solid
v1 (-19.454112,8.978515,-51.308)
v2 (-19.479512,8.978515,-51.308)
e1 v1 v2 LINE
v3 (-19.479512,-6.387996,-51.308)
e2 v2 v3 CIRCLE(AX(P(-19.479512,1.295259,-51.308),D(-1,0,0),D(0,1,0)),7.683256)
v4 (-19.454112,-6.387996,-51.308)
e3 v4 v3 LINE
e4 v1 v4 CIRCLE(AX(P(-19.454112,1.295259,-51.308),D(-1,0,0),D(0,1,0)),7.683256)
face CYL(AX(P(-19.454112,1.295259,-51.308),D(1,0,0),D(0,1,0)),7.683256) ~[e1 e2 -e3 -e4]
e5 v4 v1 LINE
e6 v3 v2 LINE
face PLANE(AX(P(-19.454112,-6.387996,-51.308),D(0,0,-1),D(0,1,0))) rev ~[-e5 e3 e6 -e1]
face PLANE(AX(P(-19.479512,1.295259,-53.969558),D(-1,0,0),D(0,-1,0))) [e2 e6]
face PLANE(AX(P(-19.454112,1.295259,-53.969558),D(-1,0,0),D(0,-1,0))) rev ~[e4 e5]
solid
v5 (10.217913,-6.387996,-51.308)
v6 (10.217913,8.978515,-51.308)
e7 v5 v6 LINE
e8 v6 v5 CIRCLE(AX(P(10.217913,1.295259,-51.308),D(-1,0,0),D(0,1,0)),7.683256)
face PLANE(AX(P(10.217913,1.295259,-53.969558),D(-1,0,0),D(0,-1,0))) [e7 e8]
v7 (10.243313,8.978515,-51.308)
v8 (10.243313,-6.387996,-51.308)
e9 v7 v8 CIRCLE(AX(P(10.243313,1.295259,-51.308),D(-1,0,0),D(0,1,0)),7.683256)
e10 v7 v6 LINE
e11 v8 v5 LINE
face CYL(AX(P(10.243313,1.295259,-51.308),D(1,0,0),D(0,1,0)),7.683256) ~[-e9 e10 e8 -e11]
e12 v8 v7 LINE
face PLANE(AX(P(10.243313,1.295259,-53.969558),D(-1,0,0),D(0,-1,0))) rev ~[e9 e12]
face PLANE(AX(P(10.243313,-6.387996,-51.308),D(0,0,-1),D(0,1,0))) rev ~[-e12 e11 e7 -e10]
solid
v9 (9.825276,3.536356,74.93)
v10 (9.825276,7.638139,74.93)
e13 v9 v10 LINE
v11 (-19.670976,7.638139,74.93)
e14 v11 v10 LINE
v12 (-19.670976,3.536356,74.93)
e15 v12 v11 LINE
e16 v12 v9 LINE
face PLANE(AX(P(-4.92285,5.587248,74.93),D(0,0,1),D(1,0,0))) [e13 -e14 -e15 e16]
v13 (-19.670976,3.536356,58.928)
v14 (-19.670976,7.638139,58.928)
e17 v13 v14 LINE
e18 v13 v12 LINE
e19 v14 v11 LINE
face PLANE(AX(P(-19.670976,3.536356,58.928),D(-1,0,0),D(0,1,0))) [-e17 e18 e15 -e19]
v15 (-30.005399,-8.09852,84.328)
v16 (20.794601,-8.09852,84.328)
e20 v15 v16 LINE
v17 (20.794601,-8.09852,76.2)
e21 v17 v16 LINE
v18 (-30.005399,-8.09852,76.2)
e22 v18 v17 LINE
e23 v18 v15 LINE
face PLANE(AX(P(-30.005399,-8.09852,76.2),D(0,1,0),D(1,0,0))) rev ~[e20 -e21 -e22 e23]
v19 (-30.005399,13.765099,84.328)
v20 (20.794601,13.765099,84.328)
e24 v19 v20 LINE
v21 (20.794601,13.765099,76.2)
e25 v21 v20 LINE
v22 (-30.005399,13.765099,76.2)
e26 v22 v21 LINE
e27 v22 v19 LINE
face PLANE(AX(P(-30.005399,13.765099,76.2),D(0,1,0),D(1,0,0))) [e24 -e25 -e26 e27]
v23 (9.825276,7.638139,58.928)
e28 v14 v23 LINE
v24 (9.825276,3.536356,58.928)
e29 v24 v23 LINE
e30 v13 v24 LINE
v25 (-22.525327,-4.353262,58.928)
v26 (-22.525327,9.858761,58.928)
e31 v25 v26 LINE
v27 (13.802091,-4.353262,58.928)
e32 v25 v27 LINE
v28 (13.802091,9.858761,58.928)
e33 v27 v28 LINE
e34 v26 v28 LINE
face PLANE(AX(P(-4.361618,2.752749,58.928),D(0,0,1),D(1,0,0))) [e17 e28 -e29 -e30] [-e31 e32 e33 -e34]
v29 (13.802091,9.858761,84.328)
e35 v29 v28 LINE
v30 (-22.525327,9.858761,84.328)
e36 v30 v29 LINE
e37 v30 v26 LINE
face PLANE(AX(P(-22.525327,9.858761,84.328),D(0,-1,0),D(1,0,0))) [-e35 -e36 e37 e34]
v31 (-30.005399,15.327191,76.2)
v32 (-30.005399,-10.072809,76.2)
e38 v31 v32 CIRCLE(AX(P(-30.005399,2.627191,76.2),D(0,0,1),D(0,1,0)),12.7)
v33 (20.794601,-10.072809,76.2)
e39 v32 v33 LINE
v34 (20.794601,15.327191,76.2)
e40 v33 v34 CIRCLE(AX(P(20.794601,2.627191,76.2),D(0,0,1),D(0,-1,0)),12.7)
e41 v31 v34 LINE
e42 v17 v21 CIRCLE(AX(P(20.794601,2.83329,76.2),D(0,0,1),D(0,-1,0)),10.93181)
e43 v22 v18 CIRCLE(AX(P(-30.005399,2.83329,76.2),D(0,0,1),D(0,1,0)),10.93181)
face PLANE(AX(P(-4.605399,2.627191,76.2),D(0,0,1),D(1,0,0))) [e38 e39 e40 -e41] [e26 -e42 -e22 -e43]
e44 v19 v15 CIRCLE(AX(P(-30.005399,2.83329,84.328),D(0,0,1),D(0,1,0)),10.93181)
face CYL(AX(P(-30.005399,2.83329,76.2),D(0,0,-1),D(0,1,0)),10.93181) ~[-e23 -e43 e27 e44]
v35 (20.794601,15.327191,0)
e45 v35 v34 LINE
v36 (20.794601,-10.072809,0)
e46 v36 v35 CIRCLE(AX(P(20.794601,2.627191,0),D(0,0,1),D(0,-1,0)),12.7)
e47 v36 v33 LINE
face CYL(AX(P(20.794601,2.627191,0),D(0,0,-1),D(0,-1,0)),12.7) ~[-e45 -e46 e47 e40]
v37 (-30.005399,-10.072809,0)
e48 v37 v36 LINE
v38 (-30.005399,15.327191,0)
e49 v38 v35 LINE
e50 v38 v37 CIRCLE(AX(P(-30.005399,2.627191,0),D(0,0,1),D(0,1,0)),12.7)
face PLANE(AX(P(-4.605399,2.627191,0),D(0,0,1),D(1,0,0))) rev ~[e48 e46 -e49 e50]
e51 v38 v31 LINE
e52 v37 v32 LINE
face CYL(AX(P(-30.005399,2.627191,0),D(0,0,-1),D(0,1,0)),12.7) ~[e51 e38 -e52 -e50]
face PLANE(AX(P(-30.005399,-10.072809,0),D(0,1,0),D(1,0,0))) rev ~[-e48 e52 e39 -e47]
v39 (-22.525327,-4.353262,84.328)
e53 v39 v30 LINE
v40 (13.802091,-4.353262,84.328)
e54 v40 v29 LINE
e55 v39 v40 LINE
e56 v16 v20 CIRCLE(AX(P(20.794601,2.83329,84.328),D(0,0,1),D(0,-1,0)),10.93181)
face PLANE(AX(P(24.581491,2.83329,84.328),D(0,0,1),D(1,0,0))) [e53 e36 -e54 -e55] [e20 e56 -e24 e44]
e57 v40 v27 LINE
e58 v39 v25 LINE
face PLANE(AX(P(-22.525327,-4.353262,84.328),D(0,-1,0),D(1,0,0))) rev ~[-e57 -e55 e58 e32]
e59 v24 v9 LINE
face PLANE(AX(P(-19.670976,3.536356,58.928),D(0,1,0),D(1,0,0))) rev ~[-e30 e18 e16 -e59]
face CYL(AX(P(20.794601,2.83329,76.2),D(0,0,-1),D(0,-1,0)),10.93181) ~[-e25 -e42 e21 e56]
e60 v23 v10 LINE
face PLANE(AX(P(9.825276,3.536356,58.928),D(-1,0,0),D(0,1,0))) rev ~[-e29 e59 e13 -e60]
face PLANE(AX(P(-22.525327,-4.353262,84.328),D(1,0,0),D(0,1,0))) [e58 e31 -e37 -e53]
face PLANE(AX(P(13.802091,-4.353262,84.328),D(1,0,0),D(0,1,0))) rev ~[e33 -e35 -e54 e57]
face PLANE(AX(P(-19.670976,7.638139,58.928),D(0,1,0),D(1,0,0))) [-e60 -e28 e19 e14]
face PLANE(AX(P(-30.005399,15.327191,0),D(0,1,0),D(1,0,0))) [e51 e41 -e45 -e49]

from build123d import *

# Parameters (mm, degrees)
F0_W      = 50.8
F0_H      = 25.4
F1_DEPTH  = 76.2
F2_W      = 50.8
F2_H      = 21.8636197969
F3_DEPTH  = 8.128
F4_W      = 36.3274179399
F4_H      = 14.2120234668
F5_DEPTH  = 25.4
F6_W      = 29.4962525368
F6_H      = 4.1017830372
F7_DEPTH  = 16.002
F11_DEPTH = 0.0254
F13_DEPTH = 0.0254


with BuildPart() as f1:
    # F0 (on Top) → F1 (new body)
    with BuildSketch(Plane.XY):
        with Locations((-4.6053994447, 2.627191287)):
            Rectangle(F0_W, F0_H)
        with BuildLine():
            Line((-30.0053994447, -10.072808713), (-30.0053994447, 15.327191287))
            ThreePointArc((-30.0053994447, 15.327191287), (-42.7053994447, 2.627191287), (-30.0053994447, -10.072808713))
        make_face()
        with BuildLine():
            ThreePointArc((20.7946005553, -10.072808713), (33.4946005553, 2.627191287), (20.7946005553, 15.327191287))
            Line((20.7946005553, 15.327191287), (20.7946005553, -10.072808713))
        make_face()
    extrude(amount=F1_DEPTH)

    # F2 (on face) → F3 (join)
    with BuildSketch(Plane.XY.offset(76.2)):
        with BuildLine():
            ThreePointArc((20.7946005553, -8.0985203385), (31.7264104538, 2.8332895599), (20.7946005553, 13.7650994584))
            Line((20.7946005553, 13.7650994584), (20.7946005553, -8.0985203385))
        make_face()
        with Locations((-4.6053994447, 2.8332895599)):
            Rectangle(F2_W, F2_H)
        with BuildLine():
            Line((-30.0053994447, -8.0985203385), (-30.0053994447, 13.7650994584))
            ThreePointArc((-30.0053994447, 13.7650994584), (-40.9372093432, 2.8332895599), (-30.0053994447, -8.0985203385))
        make_face()
    extrude(amount=F3_DEPTH)

    # F4 (on face) → F5 (cut)
    with BuildSketch(Plane.XY.offset(84.328)):
        with Locations((-4.3616183102, 2.7527492493)):
            Rectangle(F4_W, F4_H)
    extrude(amount=-F5_DEPTH, mode=Mode.SUBTRACT)

    # F6 (on face) → F7 (join)
    with BuildSketch(Plane.XY.offset(58.928)):
        with Locations((-4.9228500575, 5.587247666)):
            Rectangle(F6_W, F6_H)
    extrude(amount=F7_DEPTH)


with BuildPart() as f11:
    # F10 (on face) → F11 (new body)
    with BuildSketch(Plane(origin=(-19.4541122764, 0, 0), x_dir=(0, -1, 0), z_dir=(-1, 0, 0))):
        with BuildLine():
            Line((6.3879964873, -51.308), (-8.9785149321, -51.308))
            ThreePointArc((-8.9785149321, -51.308), (-1.2952592224, -58.9912557097), (6.3879964873, -51.308))
        make_face()
    extrude(amount=F11_DEPTH)


with BuildPart() as f13:
    # F12 (on face) → F13 (new body)
    with BuildSketch(Plane(origin=(10.243313387, 0, 0), x_dir=(0, -1, 0), z_dir=(-1, 0, 0))):
        with BuildLine():
            Line((6.3879964873, -51.308), (-8.9785149321, -51.308))
            ThreePointArc((-8.9785149321, -51.308), (-1.2952592224, -58.9912557097), (6.3879964873, -51.308))
        make_face()
    extrude(amount=F13_DEPTH)


solid = Compound([f1.part, f11.part, f13.part])
